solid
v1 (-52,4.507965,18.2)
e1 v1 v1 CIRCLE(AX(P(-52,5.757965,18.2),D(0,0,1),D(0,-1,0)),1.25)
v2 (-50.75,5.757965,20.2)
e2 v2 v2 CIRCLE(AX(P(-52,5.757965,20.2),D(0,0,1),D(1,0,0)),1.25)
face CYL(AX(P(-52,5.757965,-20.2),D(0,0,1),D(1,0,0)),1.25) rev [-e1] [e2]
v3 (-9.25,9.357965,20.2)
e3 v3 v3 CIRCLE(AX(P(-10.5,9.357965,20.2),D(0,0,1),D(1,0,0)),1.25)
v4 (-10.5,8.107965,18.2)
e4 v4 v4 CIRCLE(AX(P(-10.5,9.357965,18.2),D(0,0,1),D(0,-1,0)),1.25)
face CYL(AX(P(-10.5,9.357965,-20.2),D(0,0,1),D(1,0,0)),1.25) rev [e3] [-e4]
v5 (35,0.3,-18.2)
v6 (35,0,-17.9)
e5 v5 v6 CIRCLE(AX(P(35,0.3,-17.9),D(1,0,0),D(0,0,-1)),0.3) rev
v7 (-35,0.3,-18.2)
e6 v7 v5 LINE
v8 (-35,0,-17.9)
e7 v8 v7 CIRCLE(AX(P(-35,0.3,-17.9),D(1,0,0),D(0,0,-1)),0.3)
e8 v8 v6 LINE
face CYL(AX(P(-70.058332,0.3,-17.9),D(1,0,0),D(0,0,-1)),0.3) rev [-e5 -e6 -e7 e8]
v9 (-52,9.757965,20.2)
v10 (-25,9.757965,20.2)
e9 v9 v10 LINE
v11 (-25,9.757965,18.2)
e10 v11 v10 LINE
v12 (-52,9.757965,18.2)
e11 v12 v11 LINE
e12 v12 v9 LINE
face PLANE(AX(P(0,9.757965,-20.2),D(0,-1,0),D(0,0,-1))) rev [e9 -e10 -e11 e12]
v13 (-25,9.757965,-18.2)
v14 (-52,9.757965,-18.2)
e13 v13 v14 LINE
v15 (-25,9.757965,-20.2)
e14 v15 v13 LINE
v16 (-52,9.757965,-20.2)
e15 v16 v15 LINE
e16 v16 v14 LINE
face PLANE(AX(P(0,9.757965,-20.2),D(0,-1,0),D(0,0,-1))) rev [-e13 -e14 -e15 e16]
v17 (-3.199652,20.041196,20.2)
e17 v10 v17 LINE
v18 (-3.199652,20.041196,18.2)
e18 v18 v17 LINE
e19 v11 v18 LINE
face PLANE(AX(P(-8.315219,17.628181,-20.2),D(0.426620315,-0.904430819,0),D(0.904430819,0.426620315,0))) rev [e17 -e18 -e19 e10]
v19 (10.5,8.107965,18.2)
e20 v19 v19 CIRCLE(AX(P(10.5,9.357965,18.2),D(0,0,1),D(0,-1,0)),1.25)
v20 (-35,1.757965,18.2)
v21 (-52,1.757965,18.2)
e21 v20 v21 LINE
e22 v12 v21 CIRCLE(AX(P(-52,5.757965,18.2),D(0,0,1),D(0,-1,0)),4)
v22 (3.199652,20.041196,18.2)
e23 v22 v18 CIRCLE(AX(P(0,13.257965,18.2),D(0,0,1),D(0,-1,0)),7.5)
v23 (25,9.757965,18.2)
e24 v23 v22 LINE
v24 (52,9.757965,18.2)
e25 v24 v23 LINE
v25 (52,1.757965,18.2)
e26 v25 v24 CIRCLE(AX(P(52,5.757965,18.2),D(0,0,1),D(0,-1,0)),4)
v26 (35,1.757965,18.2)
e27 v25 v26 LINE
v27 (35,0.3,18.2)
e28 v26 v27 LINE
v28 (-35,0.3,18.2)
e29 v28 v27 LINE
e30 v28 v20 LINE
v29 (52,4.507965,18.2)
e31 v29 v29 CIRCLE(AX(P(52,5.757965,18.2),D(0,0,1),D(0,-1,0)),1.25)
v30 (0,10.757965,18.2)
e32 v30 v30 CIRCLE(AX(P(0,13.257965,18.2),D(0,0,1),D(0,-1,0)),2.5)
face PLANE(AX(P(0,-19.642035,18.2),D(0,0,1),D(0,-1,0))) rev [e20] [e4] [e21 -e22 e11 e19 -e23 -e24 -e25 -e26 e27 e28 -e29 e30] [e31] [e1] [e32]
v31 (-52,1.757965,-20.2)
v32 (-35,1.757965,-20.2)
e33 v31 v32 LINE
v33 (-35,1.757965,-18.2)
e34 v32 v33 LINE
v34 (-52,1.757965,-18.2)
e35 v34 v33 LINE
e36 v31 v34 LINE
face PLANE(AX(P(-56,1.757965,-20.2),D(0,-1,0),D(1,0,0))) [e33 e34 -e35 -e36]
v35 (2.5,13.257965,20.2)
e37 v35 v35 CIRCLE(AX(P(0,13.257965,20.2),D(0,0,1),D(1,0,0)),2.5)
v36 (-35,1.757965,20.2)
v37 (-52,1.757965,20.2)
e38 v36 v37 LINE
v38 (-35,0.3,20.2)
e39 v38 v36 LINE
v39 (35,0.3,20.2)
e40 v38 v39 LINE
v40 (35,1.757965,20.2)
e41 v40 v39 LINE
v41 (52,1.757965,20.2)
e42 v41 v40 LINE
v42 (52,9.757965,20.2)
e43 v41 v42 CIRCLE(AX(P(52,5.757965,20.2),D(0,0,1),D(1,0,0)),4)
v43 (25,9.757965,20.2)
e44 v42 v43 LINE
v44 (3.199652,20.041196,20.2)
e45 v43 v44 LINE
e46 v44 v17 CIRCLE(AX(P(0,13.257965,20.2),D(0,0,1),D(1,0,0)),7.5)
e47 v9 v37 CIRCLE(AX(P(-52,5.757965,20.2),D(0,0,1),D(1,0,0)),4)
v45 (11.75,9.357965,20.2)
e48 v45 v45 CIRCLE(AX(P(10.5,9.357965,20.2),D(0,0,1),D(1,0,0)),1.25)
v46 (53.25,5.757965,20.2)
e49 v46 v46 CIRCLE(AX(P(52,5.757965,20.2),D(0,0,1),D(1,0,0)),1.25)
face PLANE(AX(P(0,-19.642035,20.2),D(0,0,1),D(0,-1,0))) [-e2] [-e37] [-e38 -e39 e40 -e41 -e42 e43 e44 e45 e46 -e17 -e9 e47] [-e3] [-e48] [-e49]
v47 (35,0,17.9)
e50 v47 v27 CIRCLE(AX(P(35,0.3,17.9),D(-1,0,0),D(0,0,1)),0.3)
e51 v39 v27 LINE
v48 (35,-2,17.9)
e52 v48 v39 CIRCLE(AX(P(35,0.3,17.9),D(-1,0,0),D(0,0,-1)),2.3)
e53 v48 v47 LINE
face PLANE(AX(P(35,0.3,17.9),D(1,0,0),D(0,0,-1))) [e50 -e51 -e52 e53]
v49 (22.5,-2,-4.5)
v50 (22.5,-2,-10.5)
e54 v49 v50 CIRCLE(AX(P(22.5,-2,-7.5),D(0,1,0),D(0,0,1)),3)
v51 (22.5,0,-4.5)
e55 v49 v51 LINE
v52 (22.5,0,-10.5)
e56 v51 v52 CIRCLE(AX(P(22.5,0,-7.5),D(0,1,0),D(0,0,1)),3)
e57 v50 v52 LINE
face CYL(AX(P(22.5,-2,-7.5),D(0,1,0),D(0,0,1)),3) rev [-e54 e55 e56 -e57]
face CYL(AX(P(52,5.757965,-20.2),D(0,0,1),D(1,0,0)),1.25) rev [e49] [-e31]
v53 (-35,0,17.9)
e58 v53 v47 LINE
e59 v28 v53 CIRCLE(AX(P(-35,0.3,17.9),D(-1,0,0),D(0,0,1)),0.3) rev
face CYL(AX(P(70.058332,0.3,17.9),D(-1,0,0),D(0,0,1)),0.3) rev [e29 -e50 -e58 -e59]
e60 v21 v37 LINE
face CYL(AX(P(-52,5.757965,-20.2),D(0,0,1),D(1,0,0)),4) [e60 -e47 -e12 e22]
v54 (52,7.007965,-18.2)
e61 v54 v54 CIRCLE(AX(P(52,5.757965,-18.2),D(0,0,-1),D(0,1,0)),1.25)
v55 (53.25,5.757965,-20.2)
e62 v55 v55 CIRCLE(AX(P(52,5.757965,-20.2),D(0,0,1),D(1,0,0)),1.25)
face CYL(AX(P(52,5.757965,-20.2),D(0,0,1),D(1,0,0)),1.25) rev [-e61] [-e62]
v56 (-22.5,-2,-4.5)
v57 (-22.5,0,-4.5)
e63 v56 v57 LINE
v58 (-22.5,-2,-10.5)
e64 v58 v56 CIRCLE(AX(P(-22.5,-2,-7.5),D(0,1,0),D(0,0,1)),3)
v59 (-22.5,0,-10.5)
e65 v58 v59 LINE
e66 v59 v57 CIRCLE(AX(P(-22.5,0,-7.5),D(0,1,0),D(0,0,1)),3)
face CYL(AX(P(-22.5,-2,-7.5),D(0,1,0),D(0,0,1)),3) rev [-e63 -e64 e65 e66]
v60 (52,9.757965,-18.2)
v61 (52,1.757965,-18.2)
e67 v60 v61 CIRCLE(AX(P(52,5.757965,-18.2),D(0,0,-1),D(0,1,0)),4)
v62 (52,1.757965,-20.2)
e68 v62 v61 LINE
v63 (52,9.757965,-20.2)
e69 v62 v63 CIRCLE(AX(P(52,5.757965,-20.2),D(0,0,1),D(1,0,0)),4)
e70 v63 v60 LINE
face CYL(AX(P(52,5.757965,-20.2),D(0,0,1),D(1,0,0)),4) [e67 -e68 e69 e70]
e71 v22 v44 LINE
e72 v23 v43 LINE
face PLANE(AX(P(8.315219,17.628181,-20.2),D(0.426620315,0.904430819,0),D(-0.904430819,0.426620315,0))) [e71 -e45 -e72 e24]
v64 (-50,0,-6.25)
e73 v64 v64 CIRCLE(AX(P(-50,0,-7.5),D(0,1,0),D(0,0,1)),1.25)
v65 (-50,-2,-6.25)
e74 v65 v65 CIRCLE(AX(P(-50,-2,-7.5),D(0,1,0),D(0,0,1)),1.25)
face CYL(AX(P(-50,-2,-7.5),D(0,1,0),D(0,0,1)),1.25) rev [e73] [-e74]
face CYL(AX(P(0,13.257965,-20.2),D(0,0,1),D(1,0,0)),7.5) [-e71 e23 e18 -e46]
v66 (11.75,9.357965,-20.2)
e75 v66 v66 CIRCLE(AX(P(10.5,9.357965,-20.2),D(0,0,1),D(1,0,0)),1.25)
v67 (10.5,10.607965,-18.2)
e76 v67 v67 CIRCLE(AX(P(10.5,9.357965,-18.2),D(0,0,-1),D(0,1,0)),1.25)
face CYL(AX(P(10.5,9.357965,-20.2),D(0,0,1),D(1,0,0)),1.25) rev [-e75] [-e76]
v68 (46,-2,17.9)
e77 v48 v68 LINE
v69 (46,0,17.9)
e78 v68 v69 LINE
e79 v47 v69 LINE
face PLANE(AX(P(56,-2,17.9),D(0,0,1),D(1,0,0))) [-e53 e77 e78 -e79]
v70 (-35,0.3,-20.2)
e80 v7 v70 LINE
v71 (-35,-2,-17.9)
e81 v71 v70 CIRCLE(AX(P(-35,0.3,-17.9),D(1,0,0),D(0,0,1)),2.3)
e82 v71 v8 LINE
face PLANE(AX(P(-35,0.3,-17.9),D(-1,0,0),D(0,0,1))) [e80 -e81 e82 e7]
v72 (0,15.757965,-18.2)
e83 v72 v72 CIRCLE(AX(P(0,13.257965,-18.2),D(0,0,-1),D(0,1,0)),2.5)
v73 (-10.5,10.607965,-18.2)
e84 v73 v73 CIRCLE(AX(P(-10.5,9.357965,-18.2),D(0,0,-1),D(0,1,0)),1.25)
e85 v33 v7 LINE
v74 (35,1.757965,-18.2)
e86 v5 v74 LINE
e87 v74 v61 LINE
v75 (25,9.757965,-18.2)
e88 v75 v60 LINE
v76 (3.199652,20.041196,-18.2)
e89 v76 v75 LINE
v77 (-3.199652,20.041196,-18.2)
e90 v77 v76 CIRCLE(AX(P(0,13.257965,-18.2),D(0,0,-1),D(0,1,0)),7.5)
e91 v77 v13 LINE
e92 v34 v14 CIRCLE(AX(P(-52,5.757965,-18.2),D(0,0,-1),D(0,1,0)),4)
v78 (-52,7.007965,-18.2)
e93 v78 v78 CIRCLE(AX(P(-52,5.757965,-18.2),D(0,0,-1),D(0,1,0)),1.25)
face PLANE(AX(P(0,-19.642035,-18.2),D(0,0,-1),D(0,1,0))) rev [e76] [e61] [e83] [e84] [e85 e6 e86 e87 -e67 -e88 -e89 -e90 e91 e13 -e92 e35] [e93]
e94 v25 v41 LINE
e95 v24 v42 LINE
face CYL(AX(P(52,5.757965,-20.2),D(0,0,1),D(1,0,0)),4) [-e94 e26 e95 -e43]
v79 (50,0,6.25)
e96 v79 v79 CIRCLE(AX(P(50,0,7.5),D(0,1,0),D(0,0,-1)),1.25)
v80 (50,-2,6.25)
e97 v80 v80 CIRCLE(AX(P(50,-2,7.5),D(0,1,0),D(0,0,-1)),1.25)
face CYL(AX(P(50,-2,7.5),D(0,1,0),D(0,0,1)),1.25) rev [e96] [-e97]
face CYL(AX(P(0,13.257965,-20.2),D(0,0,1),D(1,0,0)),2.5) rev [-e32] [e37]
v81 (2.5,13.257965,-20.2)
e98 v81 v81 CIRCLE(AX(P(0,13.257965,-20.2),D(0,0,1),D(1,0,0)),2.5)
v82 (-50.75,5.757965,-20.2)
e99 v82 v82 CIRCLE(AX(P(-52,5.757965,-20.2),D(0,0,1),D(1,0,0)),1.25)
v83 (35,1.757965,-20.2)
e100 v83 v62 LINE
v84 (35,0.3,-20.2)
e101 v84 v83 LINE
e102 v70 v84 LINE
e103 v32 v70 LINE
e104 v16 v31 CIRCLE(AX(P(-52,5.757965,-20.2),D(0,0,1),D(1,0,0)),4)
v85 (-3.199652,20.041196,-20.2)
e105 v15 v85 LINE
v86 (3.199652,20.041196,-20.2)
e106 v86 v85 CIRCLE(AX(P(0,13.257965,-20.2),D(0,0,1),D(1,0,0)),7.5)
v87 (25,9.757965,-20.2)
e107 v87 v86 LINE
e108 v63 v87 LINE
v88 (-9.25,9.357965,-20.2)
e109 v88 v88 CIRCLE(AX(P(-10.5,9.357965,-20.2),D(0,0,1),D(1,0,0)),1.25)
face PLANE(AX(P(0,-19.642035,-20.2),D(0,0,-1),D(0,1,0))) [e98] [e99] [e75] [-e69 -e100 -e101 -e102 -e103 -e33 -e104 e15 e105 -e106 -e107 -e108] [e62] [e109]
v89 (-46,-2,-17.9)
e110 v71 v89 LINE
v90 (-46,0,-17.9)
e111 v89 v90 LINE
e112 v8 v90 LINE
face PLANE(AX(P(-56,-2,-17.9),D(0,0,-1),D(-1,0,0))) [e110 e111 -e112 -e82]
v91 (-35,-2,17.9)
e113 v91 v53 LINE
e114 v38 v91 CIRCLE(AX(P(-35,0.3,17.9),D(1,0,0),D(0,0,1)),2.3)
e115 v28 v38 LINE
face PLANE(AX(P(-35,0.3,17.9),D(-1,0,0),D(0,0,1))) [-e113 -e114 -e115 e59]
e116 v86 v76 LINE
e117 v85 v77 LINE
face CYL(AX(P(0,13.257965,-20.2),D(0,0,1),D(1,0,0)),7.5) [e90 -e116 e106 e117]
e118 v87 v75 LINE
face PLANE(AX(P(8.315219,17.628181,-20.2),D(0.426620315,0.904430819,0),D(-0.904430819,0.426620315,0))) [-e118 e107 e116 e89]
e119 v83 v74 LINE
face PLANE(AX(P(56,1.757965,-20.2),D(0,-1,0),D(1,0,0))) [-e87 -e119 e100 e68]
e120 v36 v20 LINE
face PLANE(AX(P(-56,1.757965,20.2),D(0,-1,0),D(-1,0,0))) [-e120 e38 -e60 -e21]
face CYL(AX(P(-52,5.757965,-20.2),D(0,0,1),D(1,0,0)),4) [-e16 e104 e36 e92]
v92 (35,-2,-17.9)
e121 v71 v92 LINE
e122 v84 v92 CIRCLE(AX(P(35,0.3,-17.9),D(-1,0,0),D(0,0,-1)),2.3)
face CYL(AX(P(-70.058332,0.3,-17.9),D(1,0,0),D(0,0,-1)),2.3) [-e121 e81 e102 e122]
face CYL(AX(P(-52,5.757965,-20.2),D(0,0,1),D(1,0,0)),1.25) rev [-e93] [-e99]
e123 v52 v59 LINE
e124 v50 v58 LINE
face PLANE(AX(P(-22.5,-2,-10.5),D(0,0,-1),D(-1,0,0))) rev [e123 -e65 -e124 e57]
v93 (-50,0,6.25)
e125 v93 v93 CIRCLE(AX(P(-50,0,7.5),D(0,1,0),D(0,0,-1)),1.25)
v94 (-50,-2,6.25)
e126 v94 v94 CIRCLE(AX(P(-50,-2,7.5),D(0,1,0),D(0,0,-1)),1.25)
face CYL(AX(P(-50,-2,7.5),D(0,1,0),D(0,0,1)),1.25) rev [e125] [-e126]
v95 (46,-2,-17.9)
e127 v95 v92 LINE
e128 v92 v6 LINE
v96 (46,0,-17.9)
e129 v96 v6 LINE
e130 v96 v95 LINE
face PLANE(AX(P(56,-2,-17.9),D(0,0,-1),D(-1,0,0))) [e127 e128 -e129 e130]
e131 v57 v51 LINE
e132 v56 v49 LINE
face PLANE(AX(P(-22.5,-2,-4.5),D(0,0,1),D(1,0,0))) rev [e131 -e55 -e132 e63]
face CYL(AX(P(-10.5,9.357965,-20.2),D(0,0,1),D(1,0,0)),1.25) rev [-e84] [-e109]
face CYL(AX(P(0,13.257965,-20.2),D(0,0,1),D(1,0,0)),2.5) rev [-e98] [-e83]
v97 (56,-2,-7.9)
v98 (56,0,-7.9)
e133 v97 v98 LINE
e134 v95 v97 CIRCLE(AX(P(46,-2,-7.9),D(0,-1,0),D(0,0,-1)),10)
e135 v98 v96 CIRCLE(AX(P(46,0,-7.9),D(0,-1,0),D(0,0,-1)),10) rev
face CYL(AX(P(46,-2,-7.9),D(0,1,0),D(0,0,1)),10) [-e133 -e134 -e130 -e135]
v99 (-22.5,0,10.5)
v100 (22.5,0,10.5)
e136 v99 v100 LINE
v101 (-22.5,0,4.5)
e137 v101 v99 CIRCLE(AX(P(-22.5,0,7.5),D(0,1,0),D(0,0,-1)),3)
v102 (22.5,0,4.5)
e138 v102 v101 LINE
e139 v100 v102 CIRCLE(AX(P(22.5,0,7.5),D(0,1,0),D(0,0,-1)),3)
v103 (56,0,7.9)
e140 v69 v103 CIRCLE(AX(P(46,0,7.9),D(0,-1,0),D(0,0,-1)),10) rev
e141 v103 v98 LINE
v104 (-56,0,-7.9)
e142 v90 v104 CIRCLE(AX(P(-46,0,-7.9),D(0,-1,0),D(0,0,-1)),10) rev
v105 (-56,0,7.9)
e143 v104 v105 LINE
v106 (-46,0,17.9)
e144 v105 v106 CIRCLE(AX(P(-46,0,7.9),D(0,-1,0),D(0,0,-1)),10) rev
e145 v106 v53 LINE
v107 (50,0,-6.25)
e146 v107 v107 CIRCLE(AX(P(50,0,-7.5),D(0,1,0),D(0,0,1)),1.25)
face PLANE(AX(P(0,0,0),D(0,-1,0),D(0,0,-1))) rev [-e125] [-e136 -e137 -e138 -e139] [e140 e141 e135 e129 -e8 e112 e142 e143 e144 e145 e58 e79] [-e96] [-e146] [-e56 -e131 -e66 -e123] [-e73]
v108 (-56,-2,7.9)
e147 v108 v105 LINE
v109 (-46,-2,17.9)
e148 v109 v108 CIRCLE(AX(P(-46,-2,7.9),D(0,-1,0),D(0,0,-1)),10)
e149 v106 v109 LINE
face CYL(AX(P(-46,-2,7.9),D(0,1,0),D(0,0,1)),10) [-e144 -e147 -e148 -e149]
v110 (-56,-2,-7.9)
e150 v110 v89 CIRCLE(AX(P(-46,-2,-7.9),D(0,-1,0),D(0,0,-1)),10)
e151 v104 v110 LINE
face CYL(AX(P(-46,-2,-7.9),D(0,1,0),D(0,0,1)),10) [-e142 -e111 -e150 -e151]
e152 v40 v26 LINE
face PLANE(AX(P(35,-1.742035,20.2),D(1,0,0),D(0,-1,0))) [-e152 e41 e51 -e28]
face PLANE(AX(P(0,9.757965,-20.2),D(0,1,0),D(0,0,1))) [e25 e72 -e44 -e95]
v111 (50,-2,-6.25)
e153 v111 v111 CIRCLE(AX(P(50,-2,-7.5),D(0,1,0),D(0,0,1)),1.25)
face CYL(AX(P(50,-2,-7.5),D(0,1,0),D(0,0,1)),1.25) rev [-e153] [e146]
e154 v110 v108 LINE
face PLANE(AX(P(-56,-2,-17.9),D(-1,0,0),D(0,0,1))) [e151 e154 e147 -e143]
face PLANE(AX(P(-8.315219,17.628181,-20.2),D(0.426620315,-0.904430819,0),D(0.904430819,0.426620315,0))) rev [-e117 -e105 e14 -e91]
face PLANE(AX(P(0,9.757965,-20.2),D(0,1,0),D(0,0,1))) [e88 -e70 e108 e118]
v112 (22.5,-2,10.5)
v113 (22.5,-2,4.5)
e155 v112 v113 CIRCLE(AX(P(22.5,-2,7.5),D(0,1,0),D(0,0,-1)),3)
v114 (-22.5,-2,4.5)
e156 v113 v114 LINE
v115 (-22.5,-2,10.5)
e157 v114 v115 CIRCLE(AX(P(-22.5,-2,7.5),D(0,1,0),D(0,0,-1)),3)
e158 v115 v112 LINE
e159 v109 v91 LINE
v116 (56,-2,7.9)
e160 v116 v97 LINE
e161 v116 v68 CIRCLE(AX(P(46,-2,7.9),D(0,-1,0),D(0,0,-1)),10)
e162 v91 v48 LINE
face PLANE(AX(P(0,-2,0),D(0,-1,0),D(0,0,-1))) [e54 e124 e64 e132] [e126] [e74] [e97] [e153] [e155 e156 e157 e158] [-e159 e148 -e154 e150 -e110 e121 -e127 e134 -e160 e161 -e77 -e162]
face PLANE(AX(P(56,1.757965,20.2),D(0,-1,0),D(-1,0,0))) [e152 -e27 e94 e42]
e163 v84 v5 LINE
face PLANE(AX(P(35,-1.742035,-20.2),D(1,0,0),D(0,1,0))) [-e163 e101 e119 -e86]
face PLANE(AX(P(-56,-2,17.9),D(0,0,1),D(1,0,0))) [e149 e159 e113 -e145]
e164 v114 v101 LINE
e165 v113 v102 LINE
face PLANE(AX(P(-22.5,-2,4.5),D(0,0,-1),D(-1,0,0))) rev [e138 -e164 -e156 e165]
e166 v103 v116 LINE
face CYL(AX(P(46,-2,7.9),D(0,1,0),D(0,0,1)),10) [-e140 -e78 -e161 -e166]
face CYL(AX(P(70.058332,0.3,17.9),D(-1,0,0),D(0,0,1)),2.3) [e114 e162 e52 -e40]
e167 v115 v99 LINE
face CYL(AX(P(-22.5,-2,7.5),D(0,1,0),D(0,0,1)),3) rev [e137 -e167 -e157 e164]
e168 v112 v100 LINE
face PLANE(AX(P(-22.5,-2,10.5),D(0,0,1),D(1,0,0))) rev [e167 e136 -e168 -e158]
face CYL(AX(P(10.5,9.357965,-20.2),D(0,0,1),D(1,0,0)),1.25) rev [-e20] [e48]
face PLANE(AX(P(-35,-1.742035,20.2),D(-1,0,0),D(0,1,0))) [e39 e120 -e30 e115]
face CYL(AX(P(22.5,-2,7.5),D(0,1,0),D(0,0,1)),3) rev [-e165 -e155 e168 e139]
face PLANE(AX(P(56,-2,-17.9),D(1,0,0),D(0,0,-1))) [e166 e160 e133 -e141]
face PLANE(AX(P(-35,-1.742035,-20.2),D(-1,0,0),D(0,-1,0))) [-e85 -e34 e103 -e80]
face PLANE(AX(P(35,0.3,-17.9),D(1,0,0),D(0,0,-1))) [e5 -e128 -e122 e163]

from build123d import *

# Parameters (mm, degrees)
BRIDA_BASE1_DEPTH               = 2
PLIEGUE_START                   = -56
PLIEGUE_CROQUIZADO2_DEPTH       = 112
PLIEGUE_CROQUIZADO2_2_OUTLINE_W = 19
PLIEGUE_CROQUIZADO2_2_OUTLINE_H = 2
PLIEGUE_CROQUIZADO2_2_DEPTH     = 112
PLIEGUE_START_2                 = -35
PLIEGUE_CROQUIZADO2_3_DEPTH     = 70
CROQUIS10_R                     = 1.25
CROQUIS10_R_2                   = 2.5
CORTAR_EXTRUIR2_DEPTH           = 73.104459651
CROQUIS11_R                     = 1.25
CORTAR_EXTRUIR3_DEPTH           = 10
REDONDEO1_R                     = 10


# Read off the part's stored shape, not the designer's step: Pliegue croquizado2
# Sheet-metal steps are written as plain solids
with BuildPart() as part:
    # Croquis base → Brida base1 (new body)
    with BuildSketch(Plane(origin=(0, 0, 0), x_dir=(1, 0, 0), z_dir=(0, 1, 0))):
        Polygon((56, 17.9), (56, -17.9), (35, -17.9), (35, -21.4), (56, -21.4), (56, -40.4), (-56, -40.4), (-56, -21.4), (-35, -21.4), (-35, -17.9), (-56, -17.9), (-56, 17.9), (-35, 17.9), (-35, 21.4), (-56, 21.4), (-56, 40.4), (56, 40.4), (56, 21.4), (35, 21.4), (35, 17.9), align=None)
    extrude(amount=-BRIDA_BASE1_DEPTH)

    # Pliegue croquizado2 outline → Pliegue croquizado2 (cut)
    with BuildSketch(Plane.YZ.offset(PLIEGUE_START)):
        with BuildLine():
            ThreePointArc((0, -20.18035085), (-1.429161647, -19.416575089), (-2, -17.9))
            Line((-2, -17.9), (-2, -40.4))
            Line((-2, -40.4), (0, -40.4))
            Line((0, -40.4), (0, -20.18035085))
        make_face()
        with BuildLine():
            ThreePointArc((-2, 17.9), (-1.429161647, 19.416575089), (0, 20.18035085))
            Line((0, 20.18035085), (0, 40.4))
            Line((0, 40.4), (-2, 40.4))
            Line((-2, 40.4), (-2, 17.9))
        make_face()
    extrude(amount=PLIEGUE_CROQUIZADO2_DEPTH, mode=Mode.SUBTRACT)



with BuildPart() as body_2:
    # Pliegue croquizado2 2 outline → Pliegue croquizado2 2 (new body)
    with BuildSketch(Plane.YZ.offset(PLIEGUE_START)):
        with Locations((11.257964775, -19.2)):
            Rectangle(PLIEGUE_CROQUIZADO2_2_OUTLINE_W, PLIEGUE_CROQUIZADO2_2_OUTLINE_H)
        with Locations((11.257964775, 19.2)):
            Rectangle(PLIEGUE_CROQUIZADO2_2_OUTLINE_W, PLIEGUE_CROQUIZADO2_2_OUTLINE_H)
    extrude(amount=PLIEGUE_CROQUIZADO2_2_DEPTH)


with BuildPart() as part_1:
    add(part.part)

    add(body_2.part)  # Pliegue croquizado2 3 merges body 2
    # Pliegue croquizado2 3 outline → Pliegue croquizado2 3 (add)
    with BuildSketch(Plane.YZ.offset(PLIEGUE_START_2)):
        with BuildLine():
            Line((0, -17.9), (0, -20.18035085))
            ThreePointArc((0, -20.18035085), (0.149678603, -20.195082456), (0.3, -20.2))
            Line((0.3, -20.2), (1.757964775, -20.2))
            Line((1.757964775, -20.2), (1.757964775, -18.2))
            Line((1.757964775, -18.2), (0.3, -18.2))
            ThreePointArc((0.3, -18.2), (0.087867966, -18.112132034), (0, -17.9))
        make_face()
        with BuildLine():
            ThreePointArc((0.3, 20.2), (0.149678603, 20.195082456), (0, 20.18035085))
            Line((0, 20.18035085), (0, 17.9))
            ThreePointArc((0, 17.9), (0.087867966, 18.112132034), (0.3, 18.2))
            Line((0.3, 18.2), (1.757964775, 18.2))
            Line((1.757964775, 18.2), (1.757964775, 20.2))
            Line((1.757964775, 20.2), (0.3, 20.2))
        make_face()
    extrude(amount=PLIEGUE_CROQUIZADO2_3_DEPTH)

    # Croquis10 → Cortar-Extruir2 (cut, through all)
    with BuildSketch(Plane.XY.offset(20.2)):
        with BuildLine():
            ThreePointArc((-56, 5.757964775), (-54.828427125, 8.5863919), (-52, 9.757964775))
            Line((-52, 9.757964775), (-25, 9.757964775))
            Line((-25, 9.757964775), (-3.19965236, 20.041195921))
            ThreePointArc((-3.19965236, 20.041195921), (-1.639476503, 20.576579179), (0, 20.757964775))
            Line((0, 20.757964775), (-56, 20.757964775))
            Line((-56, 20.757964775), (-56, 5.757964775))
        make_face()
        with BuildLine():
            ThreePointArc((-52, 1.757964775), (-54.828427125, 2.92953765), (-56, 5.757964775))
            Line((-56, 5.757964775), (-56, 1.757964775))
            Line((-56, 1.757964775), (-52, 1.757964775))
        make_face()
        with BuildLine():
            Line((56, 20.757964775), (0, 20.757964775))
            ThreePointArc((0, 20.757964775), (1.639476503, 20.576579179), (3.19965236, 20.041195921))
            Line((3.19965236, 20.041195921), (25, 9.757964775))
            Line((25, 9.757964775), (52, 9.757964775))
            ThreePointArc((52, 9.757964775), (54.828427125, 8.5863919), (56, 5.757964775))
            Line((56, 5.757964775), (56, 20.757964775))
        make_face()
        with BuildLine():
            Line((56, 1.757964775), (56, 5.757964775))
            ThreePointArc((56, 5.757964775), (54.828427125, 2.92953765), (52, 1.757964775))
            Line((52, 1.757964775), (56, 1.757964775))
        make_face()
        with Locations((52, 5.757964775)):
            Circle(CROQUIS10_R)
        with Locations((10.5, 9.357964775)):
            Circle(CROQUIS10_R)
        with Locations((-10.5, 9.357964775)):
            Circle(CROQUIS10_R)
        with Locations((0, 13.257964775)):
            Circle(CROQUIS10_R_2)
        with Locations((-52, 5.757964775)):
            Circle(CROQUIS10_R)
    extrude(amount=-CORTAR_EXTRUIR2_DEPTH, mode=Mode.SUBTRACT)

    # Croquis11 → Cortar-Extruir3 (cut)
    with BuildSketch(Plane(origin=(0, 0, 0), x_dir=(1, 0, 0), z_dir=(0, 1, 0))):
        with Locations(Location((-50, 7.5, 0), (0, 0, 270))):
            Circle(CROQUIS11_R)
        with Locations(Location((50, 7.5, 0), (0, 0, 270))):
            Circle(CROQUIS11_R)
        with Locations(Location((50, -7.5, 0), (0, 0, 90))):
            Circle(CROQUIS11_R)
        with Locations(Location((-50, -7.5, 0), (0, 0, 90))):
            Circle(CROQUIS11_R)
        with BuildLine():
            Line((-22.5, 10.5), (22.5, 10.5))
            ThreePointArc((22.5, 10.5), (25.5, 7.5), (22.5, 4.5))
            Line((22.5, 4.5), (-22.5, 4.5))
            ThreePointArc((-22.5, 4.5), (-25.5, 7.5), (-22.5, 10.5))
        make_face()
        with BuildLine():
            Line((-22.5, -10.5), (22.5, -10.5))
            ThreePointArc((22.5, -10.5), (25.5, -7.5), (22.5, -4.5))
            Line((22.5, -4.5), (-22.5, -4.5))
            ThreePointArc((-22.5, -4.5), (-25.5, -7.5), (-22.5, -10.5))
        make_face()
    extrude(amount=-CORTAR_EXTRUIR3_DEPTH, mode=Mode.SUBTRACT)

    # Redondeo1
    redondeo1_edges = [part_1.edges().sort_by_distance(p)[0] for p in [
        (-56, -1, 17.9),
        (-56, -1, -17.9),
        (56, -1, -17.9),
        (56, -1, 17.9),
    ]]
    fillet(redondeo1_edges, radius=REDONDEO1_R)


solid = part_1.part
